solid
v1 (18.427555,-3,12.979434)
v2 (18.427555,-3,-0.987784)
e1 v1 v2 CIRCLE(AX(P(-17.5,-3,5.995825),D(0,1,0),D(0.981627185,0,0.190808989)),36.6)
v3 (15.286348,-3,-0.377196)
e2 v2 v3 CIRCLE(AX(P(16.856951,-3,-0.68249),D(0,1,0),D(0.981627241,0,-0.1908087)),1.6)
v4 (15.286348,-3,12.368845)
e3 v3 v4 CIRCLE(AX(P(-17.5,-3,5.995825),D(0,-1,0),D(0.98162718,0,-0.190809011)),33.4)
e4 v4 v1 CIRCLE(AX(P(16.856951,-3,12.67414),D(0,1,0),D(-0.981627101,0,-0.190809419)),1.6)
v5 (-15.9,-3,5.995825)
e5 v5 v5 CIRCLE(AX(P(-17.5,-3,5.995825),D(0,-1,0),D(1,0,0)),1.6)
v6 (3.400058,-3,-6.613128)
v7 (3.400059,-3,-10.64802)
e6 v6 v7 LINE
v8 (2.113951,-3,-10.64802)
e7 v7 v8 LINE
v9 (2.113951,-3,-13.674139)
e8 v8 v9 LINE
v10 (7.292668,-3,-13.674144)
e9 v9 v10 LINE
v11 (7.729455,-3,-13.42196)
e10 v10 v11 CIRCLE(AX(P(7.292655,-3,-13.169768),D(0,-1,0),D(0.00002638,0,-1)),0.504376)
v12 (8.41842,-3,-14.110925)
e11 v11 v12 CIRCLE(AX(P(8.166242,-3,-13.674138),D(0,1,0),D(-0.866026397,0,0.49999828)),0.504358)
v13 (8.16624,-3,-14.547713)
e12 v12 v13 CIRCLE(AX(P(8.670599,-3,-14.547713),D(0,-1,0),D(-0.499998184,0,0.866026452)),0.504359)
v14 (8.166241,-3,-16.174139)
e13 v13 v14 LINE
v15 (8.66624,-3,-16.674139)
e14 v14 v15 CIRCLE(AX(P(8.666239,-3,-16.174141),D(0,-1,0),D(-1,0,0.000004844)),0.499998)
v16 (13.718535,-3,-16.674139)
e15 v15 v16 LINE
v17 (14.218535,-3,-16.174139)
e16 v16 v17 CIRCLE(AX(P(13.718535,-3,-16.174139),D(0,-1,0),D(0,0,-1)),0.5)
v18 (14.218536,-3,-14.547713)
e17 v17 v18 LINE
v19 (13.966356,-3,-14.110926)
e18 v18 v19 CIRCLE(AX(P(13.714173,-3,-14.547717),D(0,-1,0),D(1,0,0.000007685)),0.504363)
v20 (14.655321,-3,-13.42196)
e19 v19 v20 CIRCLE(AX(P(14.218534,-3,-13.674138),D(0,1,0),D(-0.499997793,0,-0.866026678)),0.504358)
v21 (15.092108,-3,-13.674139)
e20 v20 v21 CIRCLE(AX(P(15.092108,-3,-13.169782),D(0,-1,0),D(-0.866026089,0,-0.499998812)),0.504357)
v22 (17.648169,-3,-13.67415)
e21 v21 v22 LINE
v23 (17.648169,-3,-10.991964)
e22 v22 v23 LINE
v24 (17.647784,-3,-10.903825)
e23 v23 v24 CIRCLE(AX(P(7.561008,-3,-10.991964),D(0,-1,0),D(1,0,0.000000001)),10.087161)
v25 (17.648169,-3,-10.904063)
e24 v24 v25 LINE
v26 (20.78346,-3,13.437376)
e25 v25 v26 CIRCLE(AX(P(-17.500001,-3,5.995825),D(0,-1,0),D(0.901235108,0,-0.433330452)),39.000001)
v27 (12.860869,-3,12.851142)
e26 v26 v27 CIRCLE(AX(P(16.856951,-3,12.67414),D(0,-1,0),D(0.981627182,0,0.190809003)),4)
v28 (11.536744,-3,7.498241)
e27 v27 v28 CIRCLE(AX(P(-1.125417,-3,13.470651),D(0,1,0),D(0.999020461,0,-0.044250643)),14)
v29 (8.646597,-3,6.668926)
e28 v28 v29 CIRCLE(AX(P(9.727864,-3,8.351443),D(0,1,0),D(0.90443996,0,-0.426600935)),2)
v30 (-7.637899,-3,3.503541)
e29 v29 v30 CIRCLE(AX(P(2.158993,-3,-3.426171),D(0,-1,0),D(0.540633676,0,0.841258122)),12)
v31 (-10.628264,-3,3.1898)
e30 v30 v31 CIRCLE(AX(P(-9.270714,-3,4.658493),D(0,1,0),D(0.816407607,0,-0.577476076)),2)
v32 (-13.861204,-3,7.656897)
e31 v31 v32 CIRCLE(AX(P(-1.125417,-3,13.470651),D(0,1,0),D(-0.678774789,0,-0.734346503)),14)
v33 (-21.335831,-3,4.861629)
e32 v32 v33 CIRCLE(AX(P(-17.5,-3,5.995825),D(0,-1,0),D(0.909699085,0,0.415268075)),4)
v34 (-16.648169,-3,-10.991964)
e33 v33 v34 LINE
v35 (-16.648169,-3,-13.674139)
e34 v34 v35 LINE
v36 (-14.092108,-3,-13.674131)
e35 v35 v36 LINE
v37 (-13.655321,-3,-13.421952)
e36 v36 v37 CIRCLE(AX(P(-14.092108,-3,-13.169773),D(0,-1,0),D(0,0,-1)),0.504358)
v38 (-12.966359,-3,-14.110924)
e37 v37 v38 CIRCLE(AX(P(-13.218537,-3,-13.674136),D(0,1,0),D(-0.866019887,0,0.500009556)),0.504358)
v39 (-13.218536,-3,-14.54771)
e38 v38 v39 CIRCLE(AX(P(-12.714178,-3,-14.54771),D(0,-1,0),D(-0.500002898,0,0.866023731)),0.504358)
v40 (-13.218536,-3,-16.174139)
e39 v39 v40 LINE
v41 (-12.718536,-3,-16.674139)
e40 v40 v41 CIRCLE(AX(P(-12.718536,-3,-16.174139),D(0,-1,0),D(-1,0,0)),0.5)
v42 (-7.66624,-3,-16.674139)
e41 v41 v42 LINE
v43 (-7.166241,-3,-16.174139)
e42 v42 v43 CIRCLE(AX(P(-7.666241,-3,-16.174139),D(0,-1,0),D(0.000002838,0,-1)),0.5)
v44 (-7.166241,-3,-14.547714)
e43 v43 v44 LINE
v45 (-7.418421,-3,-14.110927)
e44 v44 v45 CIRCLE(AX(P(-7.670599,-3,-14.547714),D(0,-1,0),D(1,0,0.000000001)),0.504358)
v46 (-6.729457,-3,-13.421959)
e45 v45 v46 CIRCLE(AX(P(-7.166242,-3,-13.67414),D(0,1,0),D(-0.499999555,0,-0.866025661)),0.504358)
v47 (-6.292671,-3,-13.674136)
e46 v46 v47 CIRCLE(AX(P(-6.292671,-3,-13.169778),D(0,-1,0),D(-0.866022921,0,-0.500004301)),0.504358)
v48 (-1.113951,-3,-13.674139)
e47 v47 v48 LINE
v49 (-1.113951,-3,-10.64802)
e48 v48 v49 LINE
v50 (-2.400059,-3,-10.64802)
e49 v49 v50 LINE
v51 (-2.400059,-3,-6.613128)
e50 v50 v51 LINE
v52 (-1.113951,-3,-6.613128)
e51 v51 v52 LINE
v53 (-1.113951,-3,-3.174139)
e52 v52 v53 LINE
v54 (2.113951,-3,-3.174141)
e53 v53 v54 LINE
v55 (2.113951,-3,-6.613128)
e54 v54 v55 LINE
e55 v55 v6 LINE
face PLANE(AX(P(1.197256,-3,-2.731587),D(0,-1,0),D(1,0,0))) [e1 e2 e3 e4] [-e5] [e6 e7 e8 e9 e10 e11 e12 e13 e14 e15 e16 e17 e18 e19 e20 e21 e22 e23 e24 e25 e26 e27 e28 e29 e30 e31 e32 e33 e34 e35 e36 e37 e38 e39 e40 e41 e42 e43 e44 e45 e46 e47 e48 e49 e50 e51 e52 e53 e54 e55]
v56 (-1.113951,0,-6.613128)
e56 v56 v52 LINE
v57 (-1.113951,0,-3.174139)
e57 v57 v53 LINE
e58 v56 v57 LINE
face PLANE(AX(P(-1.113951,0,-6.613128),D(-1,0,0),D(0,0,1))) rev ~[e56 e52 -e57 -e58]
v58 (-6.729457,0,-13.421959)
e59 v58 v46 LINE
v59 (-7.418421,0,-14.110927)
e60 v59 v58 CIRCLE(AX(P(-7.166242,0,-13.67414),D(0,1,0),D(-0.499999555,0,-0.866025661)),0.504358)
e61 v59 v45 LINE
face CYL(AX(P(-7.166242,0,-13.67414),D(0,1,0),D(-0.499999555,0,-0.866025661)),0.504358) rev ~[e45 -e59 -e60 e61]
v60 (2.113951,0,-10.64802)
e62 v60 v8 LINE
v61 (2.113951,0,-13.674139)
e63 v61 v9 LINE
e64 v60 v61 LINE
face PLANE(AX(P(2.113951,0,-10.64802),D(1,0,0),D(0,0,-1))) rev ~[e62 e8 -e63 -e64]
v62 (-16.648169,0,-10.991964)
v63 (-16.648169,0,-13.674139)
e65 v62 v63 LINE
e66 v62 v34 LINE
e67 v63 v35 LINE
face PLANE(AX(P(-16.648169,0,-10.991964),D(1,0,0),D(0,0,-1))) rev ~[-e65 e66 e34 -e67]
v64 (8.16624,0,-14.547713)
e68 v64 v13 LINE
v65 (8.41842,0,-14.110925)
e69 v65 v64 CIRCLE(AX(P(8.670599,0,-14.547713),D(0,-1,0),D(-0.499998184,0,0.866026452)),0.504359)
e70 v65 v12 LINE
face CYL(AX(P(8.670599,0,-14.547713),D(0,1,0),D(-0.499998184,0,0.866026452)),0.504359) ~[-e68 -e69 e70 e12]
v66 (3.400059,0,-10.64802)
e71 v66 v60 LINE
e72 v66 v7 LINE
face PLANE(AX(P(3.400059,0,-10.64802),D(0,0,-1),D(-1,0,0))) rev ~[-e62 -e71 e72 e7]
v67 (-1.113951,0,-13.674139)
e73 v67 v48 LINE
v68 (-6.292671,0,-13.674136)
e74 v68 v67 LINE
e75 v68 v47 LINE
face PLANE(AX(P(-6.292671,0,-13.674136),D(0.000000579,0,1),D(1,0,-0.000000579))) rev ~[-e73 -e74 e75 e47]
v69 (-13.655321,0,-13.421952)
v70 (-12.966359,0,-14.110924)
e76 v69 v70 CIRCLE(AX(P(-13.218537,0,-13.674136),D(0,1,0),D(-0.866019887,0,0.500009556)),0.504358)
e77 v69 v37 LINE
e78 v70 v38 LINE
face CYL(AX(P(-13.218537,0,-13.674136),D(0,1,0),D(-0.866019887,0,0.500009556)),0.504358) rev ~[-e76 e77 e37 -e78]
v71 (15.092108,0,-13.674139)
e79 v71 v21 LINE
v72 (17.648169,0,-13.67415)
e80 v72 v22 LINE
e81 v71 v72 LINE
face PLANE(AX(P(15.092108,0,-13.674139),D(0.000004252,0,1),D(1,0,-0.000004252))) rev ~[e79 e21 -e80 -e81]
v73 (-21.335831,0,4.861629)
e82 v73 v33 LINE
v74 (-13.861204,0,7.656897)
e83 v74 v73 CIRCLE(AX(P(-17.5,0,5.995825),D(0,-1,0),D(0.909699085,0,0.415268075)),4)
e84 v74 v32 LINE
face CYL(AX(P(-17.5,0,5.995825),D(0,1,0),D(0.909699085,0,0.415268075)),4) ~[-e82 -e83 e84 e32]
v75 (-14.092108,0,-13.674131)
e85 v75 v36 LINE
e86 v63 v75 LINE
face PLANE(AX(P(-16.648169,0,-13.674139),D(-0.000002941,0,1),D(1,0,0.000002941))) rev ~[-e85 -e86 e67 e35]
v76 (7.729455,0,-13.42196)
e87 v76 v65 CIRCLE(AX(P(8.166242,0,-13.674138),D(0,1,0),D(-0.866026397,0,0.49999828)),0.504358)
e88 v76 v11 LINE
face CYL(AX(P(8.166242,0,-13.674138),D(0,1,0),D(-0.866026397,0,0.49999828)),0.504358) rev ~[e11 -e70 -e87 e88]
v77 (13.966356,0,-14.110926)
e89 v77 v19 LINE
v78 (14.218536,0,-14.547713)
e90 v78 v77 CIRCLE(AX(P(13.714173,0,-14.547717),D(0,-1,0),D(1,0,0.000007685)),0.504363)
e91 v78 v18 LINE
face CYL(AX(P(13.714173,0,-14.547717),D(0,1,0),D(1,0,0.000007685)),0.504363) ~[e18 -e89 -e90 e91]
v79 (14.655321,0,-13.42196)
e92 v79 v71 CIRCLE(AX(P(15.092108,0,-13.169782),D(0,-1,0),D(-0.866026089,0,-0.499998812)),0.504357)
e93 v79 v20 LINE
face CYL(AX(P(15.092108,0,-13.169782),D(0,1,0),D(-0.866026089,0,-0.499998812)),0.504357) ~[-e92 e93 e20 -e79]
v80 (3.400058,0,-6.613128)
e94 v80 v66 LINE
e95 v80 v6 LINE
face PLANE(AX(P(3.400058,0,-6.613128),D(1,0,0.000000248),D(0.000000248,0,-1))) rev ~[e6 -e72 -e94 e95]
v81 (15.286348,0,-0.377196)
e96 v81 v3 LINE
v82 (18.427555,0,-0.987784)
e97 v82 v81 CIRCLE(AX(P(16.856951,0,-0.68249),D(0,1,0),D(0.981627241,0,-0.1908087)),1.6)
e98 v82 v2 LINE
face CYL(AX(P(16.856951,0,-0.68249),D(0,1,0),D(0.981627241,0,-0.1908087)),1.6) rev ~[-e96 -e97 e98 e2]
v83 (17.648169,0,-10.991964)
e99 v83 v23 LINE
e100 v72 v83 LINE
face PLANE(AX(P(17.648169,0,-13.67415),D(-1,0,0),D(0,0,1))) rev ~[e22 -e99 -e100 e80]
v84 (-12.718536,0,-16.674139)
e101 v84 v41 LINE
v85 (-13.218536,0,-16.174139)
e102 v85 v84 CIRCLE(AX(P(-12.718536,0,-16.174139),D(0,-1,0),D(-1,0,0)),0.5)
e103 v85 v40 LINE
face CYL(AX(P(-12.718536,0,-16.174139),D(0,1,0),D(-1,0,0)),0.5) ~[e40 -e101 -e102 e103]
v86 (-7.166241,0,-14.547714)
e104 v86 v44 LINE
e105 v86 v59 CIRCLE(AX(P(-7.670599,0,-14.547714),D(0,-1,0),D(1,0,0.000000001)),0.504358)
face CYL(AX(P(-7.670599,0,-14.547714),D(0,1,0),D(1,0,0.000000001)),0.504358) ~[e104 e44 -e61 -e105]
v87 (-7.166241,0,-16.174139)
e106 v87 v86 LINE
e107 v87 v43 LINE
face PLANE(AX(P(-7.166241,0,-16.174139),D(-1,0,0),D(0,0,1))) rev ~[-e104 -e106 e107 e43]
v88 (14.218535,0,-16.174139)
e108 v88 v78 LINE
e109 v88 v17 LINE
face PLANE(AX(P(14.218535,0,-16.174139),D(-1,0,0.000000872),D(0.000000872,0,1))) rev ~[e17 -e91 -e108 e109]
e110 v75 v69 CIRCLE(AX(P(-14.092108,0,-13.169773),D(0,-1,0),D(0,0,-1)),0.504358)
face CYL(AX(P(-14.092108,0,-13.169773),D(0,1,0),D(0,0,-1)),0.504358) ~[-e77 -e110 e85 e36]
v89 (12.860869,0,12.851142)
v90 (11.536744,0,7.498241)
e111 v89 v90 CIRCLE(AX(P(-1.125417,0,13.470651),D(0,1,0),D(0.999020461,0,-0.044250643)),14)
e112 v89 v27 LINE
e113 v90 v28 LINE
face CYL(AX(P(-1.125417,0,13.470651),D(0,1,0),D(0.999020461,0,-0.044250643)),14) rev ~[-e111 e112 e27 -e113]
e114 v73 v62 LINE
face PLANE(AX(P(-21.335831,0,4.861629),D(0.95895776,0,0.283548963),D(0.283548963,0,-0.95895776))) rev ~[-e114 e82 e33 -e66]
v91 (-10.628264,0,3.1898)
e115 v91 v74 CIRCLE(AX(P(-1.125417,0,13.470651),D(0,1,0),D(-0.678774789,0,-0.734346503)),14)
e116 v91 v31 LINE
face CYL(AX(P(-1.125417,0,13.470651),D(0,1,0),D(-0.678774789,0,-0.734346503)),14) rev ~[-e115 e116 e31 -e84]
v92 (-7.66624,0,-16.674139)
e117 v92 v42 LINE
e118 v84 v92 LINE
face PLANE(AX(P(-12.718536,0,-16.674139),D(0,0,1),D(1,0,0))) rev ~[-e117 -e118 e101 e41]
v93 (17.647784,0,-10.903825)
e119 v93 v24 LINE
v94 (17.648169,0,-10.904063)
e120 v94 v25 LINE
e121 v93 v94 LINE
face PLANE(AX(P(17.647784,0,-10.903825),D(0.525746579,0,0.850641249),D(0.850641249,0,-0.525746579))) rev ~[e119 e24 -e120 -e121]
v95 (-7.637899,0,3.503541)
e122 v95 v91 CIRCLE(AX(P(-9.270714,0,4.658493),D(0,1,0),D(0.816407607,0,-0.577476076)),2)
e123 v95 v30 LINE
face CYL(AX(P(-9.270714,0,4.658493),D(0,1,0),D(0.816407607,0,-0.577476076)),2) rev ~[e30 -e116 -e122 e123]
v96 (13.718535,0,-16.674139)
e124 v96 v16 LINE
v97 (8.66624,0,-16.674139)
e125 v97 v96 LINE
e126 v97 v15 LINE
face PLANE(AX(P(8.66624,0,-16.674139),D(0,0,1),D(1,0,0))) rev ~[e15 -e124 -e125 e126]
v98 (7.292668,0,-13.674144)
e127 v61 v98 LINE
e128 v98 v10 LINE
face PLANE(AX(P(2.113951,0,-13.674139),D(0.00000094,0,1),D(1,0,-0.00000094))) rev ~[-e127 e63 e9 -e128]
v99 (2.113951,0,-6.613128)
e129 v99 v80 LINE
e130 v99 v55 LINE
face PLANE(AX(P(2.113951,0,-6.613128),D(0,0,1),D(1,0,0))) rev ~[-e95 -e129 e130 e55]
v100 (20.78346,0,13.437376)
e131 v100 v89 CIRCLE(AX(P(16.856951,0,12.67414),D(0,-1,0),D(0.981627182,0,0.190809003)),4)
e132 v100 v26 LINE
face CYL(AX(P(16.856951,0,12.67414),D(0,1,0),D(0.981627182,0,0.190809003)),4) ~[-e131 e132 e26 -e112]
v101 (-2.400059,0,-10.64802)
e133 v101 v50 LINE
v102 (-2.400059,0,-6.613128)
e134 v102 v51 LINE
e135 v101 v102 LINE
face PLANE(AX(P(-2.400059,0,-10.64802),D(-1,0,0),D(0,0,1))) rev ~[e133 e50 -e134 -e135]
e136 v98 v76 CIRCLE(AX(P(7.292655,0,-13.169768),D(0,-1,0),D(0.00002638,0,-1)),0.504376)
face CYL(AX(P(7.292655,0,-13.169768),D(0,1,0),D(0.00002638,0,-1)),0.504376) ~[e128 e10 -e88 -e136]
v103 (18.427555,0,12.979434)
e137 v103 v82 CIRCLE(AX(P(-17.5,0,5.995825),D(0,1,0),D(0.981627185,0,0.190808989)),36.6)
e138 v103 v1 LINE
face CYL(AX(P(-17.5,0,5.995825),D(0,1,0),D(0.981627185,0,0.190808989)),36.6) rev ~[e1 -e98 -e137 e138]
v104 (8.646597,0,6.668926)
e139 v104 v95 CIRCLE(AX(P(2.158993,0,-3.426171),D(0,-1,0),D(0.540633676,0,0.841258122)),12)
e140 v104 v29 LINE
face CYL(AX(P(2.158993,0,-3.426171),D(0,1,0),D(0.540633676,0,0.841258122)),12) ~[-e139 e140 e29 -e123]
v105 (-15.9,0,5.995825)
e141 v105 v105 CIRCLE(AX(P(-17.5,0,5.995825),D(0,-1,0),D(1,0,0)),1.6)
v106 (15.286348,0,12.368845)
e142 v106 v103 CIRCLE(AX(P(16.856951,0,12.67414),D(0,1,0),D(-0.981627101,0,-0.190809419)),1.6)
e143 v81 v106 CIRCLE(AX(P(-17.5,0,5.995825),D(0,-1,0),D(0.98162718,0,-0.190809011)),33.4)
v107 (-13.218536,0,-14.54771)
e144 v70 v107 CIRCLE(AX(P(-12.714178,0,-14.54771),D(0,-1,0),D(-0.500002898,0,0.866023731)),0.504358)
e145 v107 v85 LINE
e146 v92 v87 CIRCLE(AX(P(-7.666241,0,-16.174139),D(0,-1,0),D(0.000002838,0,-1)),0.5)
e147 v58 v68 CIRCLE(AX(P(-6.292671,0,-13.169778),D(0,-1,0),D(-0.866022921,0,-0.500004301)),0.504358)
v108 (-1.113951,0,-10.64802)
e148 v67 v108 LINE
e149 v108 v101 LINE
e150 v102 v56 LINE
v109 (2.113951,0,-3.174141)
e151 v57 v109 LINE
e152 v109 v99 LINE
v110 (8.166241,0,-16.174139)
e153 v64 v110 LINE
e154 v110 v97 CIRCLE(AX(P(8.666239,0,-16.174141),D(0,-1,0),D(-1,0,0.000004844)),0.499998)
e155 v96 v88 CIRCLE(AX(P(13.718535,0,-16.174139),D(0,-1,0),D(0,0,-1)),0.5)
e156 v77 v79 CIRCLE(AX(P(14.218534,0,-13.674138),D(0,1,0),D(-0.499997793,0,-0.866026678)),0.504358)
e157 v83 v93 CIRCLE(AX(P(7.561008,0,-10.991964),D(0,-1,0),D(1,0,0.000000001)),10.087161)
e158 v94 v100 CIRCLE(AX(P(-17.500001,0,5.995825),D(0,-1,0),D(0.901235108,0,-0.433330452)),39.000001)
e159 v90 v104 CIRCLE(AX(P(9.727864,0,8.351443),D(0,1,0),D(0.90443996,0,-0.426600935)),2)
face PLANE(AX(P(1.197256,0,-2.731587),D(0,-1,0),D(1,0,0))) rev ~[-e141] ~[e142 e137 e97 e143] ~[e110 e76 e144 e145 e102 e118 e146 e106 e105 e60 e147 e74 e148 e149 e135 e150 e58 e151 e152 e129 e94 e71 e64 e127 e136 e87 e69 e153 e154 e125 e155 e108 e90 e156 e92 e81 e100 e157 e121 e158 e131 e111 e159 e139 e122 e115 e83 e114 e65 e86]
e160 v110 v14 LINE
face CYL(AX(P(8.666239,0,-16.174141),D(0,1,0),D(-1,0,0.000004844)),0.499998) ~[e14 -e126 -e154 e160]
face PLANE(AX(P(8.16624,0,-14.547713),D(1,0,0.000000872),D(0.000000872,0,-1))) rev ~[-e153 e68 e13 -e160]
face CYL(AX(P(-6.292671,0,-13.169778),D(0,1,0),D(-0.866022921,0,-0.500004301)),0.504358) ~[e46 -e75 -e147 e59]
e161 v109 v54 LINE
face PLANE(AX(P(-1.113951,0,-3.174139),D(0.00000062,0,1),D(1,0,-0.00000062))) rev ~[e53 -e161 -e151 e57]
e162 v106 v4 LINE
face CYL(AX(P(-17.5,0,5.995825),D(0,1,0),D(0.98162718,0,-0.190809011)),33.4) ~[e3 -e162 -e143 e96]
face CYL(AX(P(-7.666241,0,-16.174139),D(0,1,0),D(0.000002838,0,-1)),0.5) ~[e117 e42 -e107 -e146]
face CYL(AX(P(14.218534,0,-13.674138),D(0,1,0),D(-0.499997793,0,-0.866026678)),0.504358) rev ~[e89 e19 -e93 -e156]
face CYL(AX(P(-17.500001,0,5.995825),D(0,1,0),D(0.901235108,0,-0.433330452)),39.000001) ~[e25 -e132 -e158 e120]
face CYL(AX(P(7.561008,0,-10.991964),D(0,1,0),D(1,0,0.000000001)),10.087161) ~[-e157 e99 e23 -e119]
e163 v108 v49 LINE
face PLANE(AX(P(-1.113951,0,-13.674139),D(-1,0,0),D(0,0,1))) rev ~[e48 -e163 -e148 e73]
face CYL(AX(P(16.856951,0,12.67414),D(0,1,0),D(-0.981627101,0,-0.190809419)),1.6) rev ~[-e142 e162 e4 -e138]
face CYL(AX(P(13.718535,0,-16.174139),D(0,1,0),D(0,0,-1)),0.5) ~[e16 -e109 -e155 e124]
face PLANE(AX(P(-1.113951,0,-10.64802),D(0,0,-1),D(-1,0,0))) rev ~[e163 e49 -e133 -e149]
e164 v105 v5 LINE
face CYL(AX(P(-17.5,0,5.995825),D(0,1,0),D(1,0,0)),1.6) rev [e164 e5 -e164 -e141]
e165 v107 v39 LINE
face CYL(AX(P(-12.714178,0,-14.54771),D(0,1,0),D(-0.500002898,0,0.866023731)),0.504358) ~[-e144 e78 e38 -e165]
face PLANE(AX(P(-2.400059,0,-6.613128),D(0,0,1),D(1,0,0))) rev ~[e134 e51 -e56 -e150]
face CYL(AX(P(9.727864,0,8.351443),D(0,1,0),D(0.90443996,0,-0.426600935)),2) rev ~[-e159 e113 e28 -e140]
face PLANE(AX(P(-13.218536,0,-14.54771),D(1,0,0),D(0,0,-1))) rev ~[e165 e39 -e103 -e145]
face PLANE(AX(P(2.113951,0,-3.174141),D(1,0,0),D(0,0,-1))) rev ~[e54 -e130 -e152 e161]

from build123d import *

# Parameters (mm, degrees)
F0_R     = 1.6
F1_DEPTH = 3


# Not quite as in the source:
# - ends of sketch curves that miss each other by under 0.0002 mm in the source are joined


with BuildPart() as f1:
    # F0 (on Front) → F1 (new body)
    with BuildSketch(Plane.XZ):
        with BuildLine():
            ThreePointArc((-10.6282638986, 3.1898001668), (-12.4668430477, 5.2626032061), (-13.8612036619, 7.6568972993))
            ThreePointArc((-13.8612036619, 7.6568972993), (-18.9011019651, 9.7424118848), (-21.335831, 4.861629))
            Line((-21.335831, 4.861629), (-16.648169, -10.991964))
            Line((-16.648169, -10.991964), (-16.648169, -13.674139))
            Line((-16.648169, -13.674139), (-14.092108, -13.6741314818))
            ThreePointArc((-14.092108, -13.6741314818), (-13.8399289655, -13.6065603025), (-13.6553211195, -13.4219524128))
            ThreePointArc((-13.6553211195, -13.4219524128), (-12.8619020996, -13.3175012704), (-12.9663588806, -14.1109235459))
            ThreePointArc((-12.9663588806, -14.1109235459), (-13.1509652395, -14.295530508), (-13.2185364188, -14.5477095425))
            Line((-13.2185364188, -14.5477095425), (-13.2185364188, -16.174139))
            ThreePointArc((-13.2185364188, -16.174139), (-13.0720898094, -16.5276923906), (-12.7185364188, -16.674139))
            Line((-12.7185364188, -16.674139), (-7.66624, -16.674139))
            ThreePointArc((-7.66624, -16.674139), (-7.3126880282, -16.5276923906), (-7.1662414188, -16.174139))
            Line((-7.1662414188, -16.174139), (-7.1662414188, -14.547714))
            ThreePointArc((-7.1662414188, -14.547714), (-7.2338128147, -14.2955345905), (-7.4184212378, -14.1109266865))
            ThreePointArc((-7.4184212378, -14.1109266865), (-7.522878567, -13.3175058971), (-6.7294565149, -13.4219591693))
            ThreePointArc((-6.7294565149, -13.4219591693), (-6.5448489948, -13.6065653787), (-6.2926709268, -13.674136))
            Line((-6.2926709268, -13.674136), (-1.113951, -13.674139))
            Line((-1.113951, -13.674139), (-1.113951, -10.64802))
            Line((-1.113951, -10.64802), (-2.400059, -10.64802))
            Line((-2.400059, -10.64802), (-2.400059, -6.613128))
            Line((-2.400059, -6.613128), (-1.113951, -6.613128))
            Line((-1.113951, -6.613128), (-1.113951, -3.174139))
            Line((-1.113951, -3.174139), (2.113951, -3.174141))
            Line((2.113951, -3.174141), (2.113951, -6.613128))
            Line((2.113951, -6.613128), (3.400058, -6.613128))
            Line((3.400058, -6.613128), (3.400059, -10.64802))
            Line((3.400059, -10.64802), (2.113951, -10.64802))
            Line((2.113951, -10.64802), (2.113951, -13.674139))
            Line((2.113951, -13.674139), (7.292668, -13.6741438699))
            ThreePointArc((7.292668, -13.6741438699), (7.5448470345, -13.6065678207), (7.7294548805, -13.421959931))
            ThreePointArc((7.7294548805, -13.421959931), (8.5228769619, -13.3175030381), (8.418420181, -14.1109253135))
            ThreePointArc((8.418420181, -14.1109253135), (8.2338115208, -14.295533374), (8.16624, -14.547713))
            Line((8.16624, -14.547713), (8.1662414188, -16.174139))
            ThreePointArc((8.1662414188, -16.174139), (8.3126866094, -16.5276923906), (8.66624, -16.674139))
            Line((8.66624, -16.674139), (13.718535, -16.674139))
            ThreePointArc((13.718535, -16.674139), (14.0720883906, -16.5276923906), (14.218535, -16.174139))
            Line((14.218535, -16.174139), (14.2185364188, -14.547713))
            ThreePointArc((14.2185364188, -14.547713), (14.1509638207, -14.2955339655), (13.966355931, -14.1109261195))
            ThreePointArc((13.966355931, -14.1109261195), (13.8618988613, -13.3175032148), (14.6553213135, -13.421959819))
            ThreePointArc((14.6553213135, -13.421959819), (14.8399289655, -13.6065678207), (15.092108, -13.674139))
            Line((15.092108, -13.674139), (17.648169, -13.6741498688))
            Line((17.648169, -13.6741498688), (17.648169, -10.991964))
            ThreePointArc((17.648169, -10.991964), (17.6480727307, -10.9478940797), (17.6477839247, -10.9038250007))
            Line((17.6477839247, -10.9038250007), (17.648169, -10.904063))
            ThreePointArc((17.648169, -10.904063), (21.1804529898, 1.0136018582), (20.7834599948, 13.437375999))
            ThreePointArc((20.7834599948, 13.437375999), (16.5617773272, 16.6632341642), (12.8608694009, 12.8511420265))
            ThreePointArc((12.8608694009, 12.8511420265), (12.4649591094, 10.1088544895), (11.5367438755, 7.4982410587))
            ThreePointArc((11.5367438755, 7.4982410587), (10.2794941976, 6.4290215203), (8.6465971955, 6.6689263042))
            ThreePointArc((8.6465971955, 6.6689263042), (-0.1307148674, 8.353355038), (-7.6378988754, 3.5035408071))
            ThreePointArc((-7.6378988754, 3.5035408071), (-9.062025187, 2.6694105221), (-10.6282638986, 3.1898001668))
        make_face()
        with Locations((-17.5000000032, 5.995824999)):
            Circle(F0_R, mode=Mode.SUBTRACT)
        with BuildLine():
            ThreePointArc((18.4275548403, 12.979433969), (19.0999998798, 5.9958249766), (18.4275548403, -0.9877840157))
            ThreePointArc((18.4275548491, -0.9877839707), (16.5516572505, -2.2530936185), (15.2863477145, -0.3771959445))
            ThreePointArc((15.2863477057, -0.3771959895), (15.8999998798, 5.9958244858), (15.286347893, 12.3688449792))
            ThreePointArc((15.286347905, 12.3688449179), (16.5516567719, 14.2447434618), (18.4275548522, 12.9794339076))
        make_face(mode=Mode.SUBTRACT)
    extrude(amount=F1_DEPTH)


solid = f1.part
